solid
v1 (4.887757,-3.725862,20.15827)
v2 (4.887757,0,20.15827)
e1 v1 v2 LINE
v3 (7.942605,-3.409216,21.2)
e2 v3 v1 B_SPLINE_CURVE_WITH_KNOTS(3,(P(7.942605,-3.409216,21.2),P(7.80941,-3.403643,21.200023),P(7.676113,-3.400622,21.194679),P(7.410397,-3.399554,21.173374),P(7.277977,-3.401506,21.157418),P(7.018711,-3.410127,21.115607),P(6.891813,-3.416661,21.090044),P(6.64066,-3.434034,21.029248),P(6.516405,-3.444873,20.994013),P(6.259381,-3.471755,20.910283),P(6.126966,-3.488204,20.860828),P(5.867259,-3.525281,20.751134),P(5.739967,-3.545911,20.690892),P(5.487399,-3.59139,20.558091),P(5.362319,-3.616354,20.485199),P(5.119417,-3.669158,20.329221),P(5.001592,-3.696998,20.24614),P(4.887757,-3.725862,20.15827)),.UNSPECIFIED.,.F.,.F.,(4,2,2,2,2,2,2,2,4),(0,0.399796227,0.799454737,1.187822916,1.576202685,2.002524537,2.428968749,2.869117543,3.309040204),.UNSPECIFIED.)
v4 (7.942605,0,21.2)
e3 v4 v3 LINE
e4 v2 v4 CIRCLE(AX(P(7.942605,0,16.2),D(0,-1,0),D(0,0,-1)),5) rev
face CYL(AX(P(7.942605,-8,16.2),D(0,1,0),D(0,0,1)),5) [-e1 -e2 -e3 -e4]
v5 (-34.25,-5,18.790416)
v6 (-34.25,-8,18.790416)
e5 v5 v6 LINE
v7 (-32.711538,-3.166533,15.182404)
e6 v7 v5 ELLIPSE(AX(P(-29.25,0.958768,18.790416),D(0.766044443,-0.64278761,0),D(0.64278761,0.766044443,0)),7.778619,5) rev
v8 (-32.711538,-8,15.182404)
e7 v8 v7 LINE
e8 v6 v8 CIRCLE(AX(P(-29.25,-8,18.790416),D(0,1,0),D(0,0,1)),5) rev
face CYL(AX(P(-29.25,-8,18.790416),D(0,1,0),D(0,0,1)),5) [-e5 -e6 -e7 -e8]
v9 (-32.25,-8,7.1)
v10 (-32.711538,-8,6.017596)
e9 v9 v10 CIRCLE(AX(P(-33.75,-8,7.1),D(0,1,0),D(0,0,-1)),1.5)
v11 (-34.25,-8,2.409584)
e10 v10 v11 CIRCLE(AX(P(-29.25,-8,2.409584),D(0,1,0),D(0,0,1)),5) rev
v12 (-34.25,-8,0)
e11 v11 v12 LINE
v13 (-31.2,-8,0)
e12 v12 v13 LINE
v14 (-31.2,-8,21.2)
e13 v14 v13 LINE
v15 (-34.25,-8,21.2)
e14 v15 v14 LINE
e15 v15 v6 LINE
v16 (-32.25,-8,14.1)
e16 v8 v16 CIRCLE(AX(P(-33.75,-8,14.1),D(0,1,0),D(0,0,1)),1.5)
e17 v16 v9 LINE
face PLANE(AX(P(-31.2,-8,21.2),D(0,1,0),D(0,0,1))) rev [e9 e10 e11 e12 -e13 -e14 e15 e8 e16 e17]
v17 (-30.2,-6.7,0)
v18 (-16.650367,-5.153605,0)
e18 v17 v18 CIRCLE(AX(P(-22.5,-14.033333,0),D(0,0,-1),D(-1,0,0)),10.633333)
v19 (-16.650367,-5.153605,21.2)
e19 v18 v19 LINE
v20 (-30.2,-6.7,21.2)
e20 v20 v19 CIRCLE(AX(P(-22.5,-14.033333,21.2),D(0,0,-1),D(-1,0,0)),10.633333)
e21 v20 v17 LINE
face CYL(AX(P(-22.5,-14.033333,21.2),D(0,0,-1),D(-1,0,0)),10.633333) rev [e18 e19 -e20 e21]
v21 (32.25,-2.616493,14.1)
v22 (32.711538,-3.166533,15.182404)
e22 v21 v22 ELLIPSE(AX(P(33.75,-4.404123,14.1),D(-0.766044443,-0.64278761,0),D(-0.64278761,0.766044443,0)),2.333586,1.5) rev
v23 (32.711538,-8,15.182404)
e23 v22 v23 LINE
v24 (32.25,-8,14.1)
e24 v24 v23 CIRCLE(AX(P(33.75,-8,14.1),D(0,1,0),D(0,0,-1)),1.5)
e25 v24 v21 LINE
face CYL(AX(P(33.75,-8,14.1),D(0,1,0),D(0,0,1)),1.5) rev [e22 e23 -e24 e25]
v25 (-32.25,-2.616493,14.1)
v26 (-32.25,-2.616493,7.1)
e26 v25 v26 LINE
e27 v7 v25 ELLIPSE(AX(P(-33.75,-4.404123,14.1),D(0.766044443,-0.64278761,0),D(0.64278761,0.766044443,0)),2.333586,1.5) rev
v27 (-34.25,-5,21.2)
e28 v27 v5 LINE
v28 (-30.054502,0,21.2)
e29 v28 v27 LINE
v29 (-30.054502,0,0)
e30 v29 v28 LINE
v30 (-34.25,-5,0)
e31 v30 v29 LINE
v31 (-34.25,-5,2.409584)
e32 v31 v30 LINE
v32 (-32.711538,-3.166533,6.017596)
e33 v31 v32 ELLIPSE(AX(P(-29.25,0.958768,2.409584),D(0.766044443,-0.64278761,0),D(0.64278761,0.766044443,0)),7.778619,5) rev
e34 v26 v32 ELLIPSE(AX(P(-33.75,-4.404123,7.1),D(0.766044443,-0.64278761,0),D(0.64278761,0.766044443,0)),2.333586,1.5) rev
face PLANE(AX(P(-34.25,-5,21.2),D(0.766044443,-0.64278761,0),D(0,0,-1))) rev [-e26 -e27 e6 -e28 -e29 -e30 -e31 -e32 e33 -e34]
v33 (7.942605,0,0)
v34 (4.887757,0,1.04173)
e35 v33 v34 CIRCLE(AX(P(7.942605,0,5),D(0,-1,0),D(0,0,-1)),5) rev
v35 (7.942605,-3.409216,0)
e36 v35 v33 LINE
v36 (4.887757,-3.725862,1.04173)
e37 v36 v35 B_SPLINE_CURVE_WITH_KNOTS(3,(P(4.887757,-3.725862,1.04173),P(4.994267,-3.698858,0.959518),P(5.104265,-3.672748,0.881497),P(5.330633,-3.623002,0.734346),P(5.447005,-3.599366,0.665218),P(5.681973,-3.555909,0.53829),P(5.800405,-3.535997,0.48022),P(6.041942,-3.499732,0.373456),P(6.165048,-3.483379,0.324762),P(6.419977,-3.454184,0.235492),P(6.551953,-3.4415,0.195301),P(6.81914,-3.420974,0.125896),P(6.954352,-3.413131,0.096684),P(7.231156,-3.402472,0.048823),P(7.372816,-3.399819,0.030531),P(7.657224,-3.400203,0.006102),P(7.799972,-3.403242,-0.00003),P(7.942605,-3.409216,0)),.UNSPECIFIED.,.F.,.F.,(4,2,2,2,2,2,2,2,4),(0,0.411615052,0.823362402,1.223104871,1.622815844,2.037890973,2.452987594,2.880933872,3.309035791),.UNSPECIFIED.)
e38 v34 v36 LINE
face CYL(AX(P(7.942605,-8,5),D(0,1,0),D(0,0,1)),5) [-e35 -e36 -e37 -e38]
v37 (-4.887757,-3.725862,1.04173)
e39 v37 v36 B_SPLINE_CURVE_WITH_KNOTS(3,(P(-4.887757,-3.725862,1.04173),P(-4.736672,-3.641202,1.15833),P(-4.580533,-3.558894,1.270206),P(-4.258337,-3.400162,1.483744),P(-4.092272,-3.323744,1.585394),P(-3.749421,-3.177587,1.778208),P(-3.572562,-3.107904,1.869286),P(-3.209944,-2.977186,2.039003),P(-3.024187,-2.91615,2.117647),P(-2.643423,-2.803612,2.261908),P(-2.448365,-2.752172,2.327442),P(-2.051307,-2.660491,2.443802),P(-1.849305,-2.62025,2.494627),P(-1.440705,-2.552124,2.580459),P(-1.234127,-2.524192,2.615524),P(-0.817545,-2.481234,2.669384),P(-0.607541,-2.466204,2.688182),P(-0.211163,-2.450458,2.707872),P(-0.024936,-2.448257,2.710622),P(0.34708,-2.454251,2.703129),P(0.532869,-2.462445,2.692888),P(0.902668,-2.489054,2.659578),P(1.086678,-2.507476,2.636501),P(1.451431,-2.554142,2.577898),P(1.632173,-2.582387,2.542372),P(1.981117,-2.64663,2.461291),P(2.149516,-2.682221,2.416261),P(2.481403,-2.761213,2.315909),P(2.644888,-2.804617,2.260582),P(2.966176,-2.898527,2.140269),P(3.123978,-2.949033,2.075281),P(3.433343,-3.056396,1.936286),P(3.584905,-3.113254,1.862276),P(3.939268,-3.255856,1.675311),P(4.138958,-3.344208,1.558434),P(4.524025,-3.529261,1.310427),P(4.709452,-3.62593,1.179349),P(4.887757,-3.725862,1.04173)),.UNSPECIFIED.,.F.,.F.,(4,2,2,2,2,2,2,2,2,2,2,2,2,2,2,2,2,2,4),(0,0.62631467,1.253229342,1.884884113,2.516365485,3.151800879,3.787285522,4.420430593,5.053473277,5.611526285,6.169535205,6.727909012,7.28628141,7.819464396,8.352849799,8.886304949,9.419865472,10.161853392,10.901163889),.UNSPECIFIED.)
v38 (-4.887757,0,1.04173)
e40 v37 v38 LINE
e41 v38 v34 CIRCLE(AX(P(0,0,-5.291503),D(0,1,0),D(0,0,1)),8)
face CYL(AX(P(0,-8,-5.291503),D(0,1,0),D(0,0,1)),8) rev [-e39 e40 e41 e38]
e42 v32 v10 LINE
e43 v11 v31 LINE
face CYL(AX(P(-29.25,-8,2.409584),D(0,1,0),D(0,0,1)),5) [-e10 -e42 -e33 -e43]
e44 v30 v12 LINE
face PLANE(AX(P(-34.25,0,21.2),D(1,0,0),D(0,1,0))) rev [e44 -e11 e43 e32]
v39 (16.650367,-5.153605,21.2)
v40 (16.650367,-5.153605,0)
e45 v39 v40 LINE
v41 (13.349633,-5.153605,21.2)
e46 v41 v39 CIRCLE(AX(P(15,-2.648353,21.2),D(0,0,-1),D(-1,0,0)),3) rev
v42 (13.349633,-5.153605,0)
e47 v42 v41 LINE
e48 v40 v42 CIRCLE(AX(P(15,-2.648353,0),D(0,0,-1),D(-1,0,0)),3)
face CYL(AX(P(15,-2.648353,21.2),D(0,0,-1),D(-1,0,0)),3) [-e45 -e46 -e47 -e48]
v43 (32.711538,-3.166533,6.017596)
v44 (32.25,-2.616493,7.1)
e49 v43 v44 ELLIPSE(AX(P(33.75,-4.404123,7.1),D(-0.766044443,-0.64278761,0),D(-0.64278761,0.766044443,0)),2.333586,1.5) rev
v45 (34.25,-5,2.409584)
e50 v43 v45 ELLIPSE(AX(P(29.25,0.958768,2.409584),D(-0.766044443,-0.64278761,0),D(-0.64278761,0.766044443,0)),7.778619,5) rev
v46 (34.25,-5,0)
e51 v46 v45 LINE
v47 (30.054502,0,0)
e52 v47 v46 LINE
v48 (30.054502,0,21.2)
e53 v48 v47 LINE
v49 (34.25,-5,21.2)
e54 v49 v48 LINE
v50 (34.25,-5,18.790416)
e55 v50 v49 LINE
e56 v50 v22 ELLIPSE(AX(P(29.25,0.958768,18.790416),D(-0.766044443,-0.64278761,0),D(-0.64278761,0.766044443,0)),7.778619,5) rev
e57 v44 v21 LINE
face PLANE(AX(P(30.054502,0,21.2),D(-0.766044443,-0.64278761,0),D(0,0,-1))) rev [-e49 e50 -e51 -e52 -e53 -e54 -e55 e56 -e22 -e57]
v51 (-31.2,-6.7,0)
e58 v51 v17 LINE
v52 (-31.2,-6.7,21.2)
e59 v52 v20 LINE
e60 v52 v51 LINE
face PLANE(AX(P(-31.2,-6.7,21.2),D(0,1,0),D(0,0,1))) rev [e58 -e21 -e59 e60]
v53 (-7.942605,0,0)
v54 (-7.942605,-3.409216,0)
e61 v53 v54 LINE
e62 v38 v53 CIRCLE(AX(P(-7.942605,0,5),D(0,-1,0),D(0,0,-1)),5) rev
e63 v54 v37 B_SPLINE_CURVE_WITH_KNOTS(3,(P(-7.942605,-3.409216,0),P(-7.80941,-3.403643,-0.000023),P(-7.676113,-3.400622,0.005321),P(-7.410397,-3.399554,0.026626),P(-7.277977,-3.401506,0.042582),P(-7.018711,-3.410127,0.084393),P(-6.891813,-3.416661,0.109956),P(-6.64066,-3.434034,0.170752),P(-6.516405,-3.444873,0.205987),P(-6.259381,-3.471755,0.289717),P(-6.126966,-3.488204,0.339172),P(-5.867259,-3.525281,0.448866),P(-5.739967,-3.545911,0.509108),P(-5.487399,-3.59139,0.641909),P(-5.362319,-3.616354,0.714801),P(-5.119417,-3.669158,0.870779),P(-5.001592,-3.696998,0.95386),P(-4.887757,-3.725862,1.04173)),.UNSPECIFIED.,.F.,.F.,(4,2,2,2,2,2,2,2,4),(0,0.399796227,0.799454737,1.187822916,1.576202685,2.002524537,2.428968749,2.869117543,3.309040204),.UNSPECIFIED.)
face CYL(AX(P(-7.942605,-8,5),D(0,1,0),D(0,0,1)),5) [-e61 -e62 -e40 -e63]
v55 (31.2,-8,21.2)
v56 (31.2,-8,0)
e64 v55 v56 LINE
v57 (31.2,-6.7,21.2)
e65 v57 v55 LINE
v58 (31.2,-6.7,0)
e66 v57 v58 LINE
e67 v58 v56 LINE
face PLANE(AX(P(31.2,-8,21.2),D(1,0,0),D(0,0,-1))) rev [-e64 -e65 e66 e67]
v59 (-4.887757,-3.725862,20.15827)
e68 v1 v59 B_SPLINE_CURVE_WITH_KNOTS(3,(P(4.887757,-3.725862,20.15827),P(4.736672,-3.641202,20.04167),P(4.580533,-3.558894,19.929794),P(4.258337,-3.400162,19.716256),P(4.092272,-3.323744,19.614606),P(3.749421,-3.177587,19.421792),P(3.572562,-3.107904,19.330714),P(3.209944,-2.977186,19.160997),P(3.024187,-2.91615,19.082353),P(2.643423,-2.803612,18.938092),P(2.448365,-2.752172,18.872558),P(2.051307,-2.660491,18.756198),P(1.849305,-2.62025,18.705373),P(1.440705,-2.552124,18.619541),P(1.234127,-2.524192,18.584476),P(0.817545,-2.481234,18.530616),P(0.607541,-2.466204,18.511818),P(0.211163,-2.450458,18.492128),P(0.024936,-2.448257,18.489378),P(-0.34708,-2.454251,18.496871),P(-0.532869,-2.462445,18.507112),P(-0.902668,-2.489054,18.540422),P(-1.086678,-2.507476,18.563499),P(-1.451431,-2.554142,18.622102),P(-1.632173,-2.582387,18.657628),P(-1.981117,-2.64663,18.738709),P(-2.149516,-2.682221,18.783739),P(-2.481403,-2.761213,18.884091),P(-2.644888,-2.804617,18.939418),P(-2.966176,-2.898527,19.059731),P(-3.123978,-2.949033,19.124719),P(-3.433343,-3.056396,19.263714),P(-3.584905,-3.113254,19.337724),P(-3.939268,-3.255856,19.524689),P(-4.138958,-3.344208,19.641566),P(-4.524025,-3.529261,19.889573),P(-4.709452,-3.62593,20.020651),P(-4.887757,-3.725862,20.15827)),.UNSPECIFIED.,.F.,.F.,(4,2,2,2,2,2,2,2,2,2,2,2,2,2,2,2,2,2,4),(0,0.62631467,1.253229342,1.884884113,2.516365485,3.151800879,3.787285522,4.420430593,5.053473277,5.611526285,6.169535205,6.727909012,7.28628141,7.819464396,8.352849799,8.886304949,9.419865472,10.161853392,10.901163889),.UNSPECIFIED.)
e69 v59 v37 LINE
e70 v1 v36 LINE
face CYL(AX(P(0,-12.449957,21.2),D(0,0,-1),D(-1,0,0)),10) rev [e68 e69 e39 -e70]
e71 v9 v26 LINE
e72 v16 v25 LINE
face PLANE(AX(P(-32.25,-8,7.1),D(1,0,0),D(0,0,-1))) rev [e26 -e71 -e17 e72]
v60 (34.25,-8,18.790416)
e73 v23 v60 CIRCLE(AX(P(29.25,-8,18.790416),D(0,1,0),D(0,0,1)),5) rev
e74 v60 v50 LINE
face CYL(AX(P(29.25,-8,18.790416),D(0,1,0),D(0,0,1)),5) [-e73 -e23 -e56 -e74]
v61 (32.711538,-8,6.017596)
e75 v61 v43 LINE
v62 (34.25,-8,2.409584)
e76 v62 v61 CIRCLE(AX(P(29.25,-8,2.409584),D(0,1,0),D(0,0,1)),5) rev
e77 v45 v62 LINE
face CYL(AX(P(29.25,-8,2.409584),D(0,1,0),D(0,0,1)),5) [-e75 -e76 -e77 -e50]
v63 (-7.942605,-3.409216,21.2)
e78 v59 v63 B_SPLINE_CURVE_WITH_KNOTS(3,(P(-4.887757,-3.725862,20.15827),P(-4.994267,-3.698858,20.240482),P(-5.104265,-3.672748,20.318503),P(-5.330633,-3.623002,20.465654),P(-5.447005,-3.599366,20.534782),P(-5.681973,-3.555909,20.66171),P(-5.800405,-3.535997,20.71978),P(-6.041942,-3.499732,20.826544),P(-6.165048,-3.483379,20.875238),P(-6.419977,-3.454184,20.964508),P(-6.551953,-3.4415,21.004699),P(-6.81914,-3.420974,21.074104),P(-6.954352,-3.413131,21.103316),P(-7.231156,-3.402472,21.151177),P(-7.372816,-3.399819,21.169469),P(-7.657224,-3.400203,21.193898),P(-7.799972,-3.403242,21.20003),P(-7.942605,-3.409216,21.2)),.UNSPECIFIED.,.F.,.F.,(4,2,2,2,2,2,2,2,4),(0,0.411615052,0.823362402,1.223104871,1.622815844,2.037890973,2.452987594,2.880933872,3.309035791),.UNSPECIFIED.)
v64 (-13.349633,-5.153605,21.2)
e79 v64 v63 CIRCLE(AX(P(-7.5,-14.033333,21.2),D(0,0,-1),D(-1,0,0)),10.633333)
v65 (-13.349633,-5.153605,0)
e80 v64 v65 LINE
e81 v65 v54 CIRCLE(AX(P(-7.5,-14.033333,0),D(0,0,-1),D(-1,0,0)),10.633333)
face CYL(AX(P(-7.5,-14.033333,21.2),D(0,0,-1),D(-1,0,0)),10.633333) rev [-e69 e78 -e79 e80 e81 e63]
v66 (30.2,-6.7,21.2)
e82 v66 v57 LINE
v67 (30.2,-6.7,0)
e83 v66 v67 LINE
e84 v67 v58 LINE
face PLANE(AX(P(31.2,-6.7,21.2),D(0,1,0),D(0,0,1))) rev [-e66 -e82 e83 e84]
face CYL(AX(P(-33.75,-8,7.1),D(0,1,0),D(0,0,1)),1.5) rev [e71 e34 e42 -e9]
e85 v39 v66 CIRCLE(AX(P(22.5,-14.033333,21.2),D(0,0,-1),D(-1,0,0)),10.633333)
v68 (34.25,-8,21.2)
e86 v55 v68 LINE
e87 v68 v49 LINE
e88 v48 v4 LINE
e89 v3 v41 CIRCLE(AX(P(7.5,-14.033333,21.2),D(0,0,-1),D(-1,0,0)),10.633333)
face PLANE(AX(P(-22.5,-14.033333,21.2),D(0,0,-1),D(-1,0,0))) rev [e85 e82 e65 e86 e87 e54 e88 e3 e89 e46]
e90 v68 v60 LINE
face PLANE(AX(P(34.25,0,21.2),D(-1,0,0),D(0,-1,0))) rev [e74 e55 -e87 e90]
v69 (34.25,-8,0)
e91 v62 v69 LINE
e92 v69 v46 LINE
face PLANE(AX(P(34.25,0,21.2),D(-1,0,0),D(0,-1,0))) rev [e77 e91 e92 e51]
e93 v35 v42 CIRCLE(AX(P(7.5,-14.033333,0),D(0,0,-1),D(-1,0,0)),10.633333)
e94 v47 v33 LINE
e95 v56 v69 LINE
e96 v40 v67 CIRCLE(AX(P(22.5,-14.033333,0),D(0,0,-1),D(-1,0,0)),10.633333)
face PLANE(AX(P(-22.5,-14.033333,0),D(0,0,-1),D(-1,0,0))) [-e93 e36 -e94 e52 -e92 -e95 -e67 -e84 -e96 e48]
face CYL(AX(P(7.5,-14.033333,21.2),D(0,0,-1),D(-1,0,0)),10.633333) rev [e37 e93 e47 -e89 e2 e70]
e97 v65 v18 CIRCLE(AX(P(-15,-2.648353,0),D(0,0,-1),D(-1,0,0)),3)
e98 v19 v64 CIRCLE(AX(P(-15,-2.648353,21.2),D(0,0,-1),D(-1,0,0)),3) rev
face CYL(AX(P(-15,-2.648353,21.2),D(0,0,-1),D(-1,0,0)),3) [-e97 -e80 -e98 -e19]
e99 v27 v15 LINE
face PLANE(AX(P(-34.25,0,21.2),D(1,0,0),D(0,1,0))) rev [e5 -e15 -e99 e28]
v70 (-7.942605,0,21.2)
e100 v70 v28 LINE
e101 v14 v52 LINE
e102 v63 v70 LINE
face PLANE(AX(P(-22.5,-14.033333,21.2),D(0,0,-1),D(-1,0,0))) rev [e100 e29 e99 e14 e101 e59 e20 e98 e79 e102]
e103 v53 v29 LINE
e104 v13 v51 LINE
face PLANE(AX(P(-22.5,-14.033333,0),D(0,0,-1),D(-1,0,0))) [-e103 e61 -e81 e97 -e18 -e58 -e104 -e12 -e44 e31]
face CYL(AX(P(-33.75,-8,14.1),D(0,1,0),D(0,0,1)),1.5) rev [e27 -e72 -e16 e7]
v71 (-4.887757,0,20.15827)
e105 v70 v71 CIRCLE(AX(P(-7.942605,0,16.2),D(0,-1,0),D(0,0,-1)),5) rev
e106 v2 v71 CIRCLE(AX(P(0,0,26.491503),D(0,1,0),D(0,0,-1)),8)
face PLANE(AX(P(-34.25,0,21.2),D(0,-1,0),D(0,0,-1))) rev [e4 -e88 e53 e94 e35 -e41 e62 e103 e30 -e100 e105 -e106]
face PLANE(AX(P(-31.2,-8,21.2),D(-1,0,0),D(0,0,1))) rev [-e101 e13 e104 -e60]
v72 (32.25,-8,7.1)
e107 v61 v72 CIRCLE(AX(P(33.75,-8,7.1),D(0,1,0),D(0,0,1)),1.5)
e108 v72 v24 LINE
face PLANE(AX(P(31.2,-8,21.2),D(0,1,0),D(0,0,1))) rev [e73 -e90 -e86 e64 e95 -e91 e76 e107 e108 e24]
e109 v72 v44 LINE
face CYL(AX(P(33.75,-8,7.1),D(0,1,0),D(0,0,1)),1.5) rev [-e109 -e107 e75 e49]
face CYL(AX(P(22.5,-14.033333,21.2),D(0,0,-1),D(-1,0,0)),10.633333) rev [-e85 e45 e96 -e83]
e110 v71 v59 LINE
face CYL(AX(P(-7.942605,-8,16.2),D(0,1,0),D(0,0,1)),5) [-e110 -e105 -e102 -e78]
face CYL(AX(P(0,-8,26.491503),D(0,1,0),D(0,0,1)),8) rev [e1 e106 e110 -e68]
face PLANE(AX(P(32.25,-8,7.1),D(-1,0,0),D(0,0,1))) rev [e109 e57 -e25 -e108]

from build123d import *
from OCP.BRepFilletAPI import BRepFilletAPI_MakeChamfer

# Parameters (mm, degrees)
BOSS_EXTRUDE2_DEPTH = 21.2
CHAMFER1_SIZE       = 5
CHAMFER1_SIZE2      = 4.195498156
CUT_EXTRUDE1_DEPTH  = 42.067048835
FILLET2_R           = 5
FILLET3_R           = 3
CUT_EXTRUDE2_DEPTH  = 42.067048989
FILLET4_R           = 5
CUT_EXTRUDE3_DEPTH  = 42.067048989


with BuildPart() as part:
    # Sketch4 → Boss-Extrude2 (new body)
    with BuildSketch(Plane.XY):
        with BuildLine():
            Line((-34.25, 0), (34.25, 0))
            Line((34.25, 0), (34.25, -8))
            Line((34.25, -8), (31.2, -8))
            Line((31.2, -8), (31.2, -6.7))
            Line((31.2, -6.7), (30.2, -6.7))
            ThreePointArc((30.2, -6.7), (22.642993845, -3.400961512), (15, -6.49557652))
            ThreePointArc((15, -6.49557652), (7.5, -3.4), (0, -6.49557652))
            ThreePointArc((0, -6.49557652), (-7.5, -3.4), (-15, -6.49557652))
            ThreePointArc((-15, -6.49557652), (-22.642993845, -3.400961512), (-30.2, -6.7))
            Line((-30.2, -6.7), (-31.2, -6.7))
            Line((-31.2, -6.7), (-31.2, -8))
            Line((-31.2, -8), (-34.25, -8))
            Line((-34.25, -8), (-34.25, 0))
        make_face()
    extrude(amount=BOSS_EXTRUDE2_DEPTH)

    # Chamfer1: one chamfer whose edges measure the first distance from different faces: ONE call of the kernel's chamfer builder (chamfer() names one face for all edges)
    chamfer1_edges_1 = [part.edges().sort_by_distance(p)[0] for p in [
        (-34.25, 0, 10.6),
    ]]
    chamfer1_side_1 = [part.faces().sort_by_distance(p)[0] for p in [
        (-34.25, -4, 10.6),
    ]]
    chamfer1_edges_2 = [part.edges().sort_by_distance(p)[0] for p in [
        (34.25, 0, 10.6),
    ]]
    chamfer1_side_2 = [part.faces().sort_by_distance(p)[0] for p in [
        (34.25, -4, 10.6),
    ]]
    chamfer1 = BRepFilletAPI_MakeChamfer(part.part.solid().wrapped)
    for e in chamfer1_edges_1:
        chamfer1.Add(CHAMFER1_SIZE, CHAMFER1_SIZE2, e.wrapped, chamfer1_side_1[0].wrapped)  # the first distance lies on this face
    for e in chamfer1_edges_2:
        chamfer1.Add(CHAMFER1_SIZE, CHAMFER1_SIZE2, e.wrapped, chamfer1_side_2[0].wrapped)  # the first distance lies on this face
    add(Compound.cast(chamfer1.Shape()), mode=Mode.REPLACE)

    # Sketch5 → Cut-Extrude1 (cut, through all)
    with BuildSketch(Plane(origin=(0, 0, 0), x_dir=(1, 0, 0), z_dir=(0, 1, 0))):
        with BuildLine():
            Line((-6, 0), (6, 0))
            ThreePointArc((6, 0), (0, -2.708497378), (-6, 0))
        make_face()
        with BuildLine():
            Line((-6, -21.2), (6, -21.2))
            ThreePointArc((6, -21.2), (0, -18.491502622), (-6, -21.2))
        make_face()
    extrude(amount=-CUT_EXTRUDE1_DEPTH, mode=Mode.SUBTRACT)

    # Fillet2
    fillet2_edges = [part.edges().sort_by_distance(p)[0] for p in [
        (6, -1.753165508, 21.2),
        (-6, -1.753165508, 21.2),
        (-6, -1.753165508, 0),
        (6, -1.753165508, 0),
    ]]
    fillet(fillet2_edges, radius=FILLET2_R)

    # Fillet3
    fillet3_edges = [part.edges().sort_by_distance(p)[0] for p in [
        (-15, -6.49557652, 10.6),
        (0, -6.49557652, 10.6),
        (15, -6.49557652, 10.6),
    ]]
    fillet(fillet3_edges, radius=FILLET3_R)

    # Sketch6 → Cut-Extrude2 (cut, through all)
    with BuildSketch(Plane(origin=(0, 0, 0), x_dir=(1, 0, 0), z_dir=(0, 1, 0))):
        with BuildLine():
            Line((34.25, -5.6), (33.75, -5.6))
            ThreePointArc((33.75, -5.6), (32.689339828, -6.039339828), (32.25, -7.1))
            Line((32.25, -7.1), (32.25, -14.1))
            ThreePointArc((32.25, -14.1), (32.689339828, -15.160660172), (33.75, -15.6))
            Line((33.75, -15.6), (34.25, -15.6))
            Line((34.25, -15.6), (34.25, -5.6))
        make_face()
        with BuildLine():
            Line((-32.25, -7.1), (-32.25, -14.1))
            ThreePointArc((-32.25, -14.1), (-32.689339828, -15.160660172), (-33.75, -15.6))
            Line((-33.75, -15.6), (-34.25, -15.6))
            Line((-34.25, -15.6), (-34.25, -5.6))
            Line((-34.25, -5.6), (-33.75, -5.6))
            ThreePointArc((-33.75, -5.6), (-32.689339828, -6.039339828), (-32.25, -7.1))
        make_face()
    extrude(amount=-CUT_EXTRUDE2_DEPTH, mode=Mode.SUBTRACT)

    # Fillet4
    # the kernel refuses this fillet: 5 mm, written as the material it takes off along each edge
    with BuildSketch(Plane(origin=(-34.25, 2.9760394, 15.6), x_dir=(0, 0, 1), z_dir=(0, -1, 0)), Plane(origin=(34.25, 2.9760394, 5.6), x_dir=(0, 0, -1), z_dir=(0, -1, 0))) as fillet4_piece_1:
        with BuildLine():
            CenterArc((3.19041576, -5), FILLET4_R, 90, 46.18693854)
            Line((-0.417596363, -1.538461538), (-0.778397575, -1.192307692))
            ThreePointArc((-0.778397575, -1.192307692), (-0.5, -0.5), (-0.5, 0))
            Line((-0.5, 0), (0, 0.5))
            Line((0, 0.5), (3.19041576, 0.5))
            Line((3.19041576, 0.5), (3.19041576, 0))
        make_face()
    extrude(amount=18.952078799, mode=Mode.SUBTRACT)
    with BuildSketch(Plane(origin=(-34.25, 2.9760394, 5.6), x_dir=(0, 0, -1), z_dir=(0, -1, 0)), Plane(origin=(34.25, 2.9760394, 15.6), x_dir=(0, 0, 1), z_dir=(0, -1, 0))) as fillet4_piece_2:
        with BuildLine():
            CenterArc((3.19041576, 5), FILLET4_R, 223.81306146, 46.18693854)
            Line((-0.417596363, 1.538461538), (-0.778397575, 1.192307692))
            ThreePointArc((-0.778397575, 1.192307692), (-0.5, 0.5), (-0.5, 0))
            Line((-0.5, 0), (0, -0.5))
            Line((0, -0.5), (3.19041576, -0.5))
            Line((3.19041576, -0.5), (3.19041576, 0))
        make_face()
    extrude(amount=18.952078799, mode=Mode.SUBTRACT)

    # Sketch7 → Cut-Extrude3 (cut, through all)
    with BuildSketch(Plane.XY):
        with BuildLine():
            ThreePointArc((-4.887756907, -3.725862072), (0, -2.449957006), (4.887756907, -3.725862072))
            ThreePointArc((4.887756907, -3.725862072), (3.209259906, -4.304133612), (1.650366748, -5.153605376))
            ThreePointArc((1.650366748, -5.153605376), (0, -5.648352974), (-1.650366748, -5.153605376))
            ThreePointArc((-1.650366748, -5.153605376), (-3.209259906, -4.304133612), (-4.887756907, -3.725862072))
        make_face()
    extrude(amount=CUT_EXTRUDE3_DEPTH, mode=Mode.SUBTRACT)


solid = part.part
